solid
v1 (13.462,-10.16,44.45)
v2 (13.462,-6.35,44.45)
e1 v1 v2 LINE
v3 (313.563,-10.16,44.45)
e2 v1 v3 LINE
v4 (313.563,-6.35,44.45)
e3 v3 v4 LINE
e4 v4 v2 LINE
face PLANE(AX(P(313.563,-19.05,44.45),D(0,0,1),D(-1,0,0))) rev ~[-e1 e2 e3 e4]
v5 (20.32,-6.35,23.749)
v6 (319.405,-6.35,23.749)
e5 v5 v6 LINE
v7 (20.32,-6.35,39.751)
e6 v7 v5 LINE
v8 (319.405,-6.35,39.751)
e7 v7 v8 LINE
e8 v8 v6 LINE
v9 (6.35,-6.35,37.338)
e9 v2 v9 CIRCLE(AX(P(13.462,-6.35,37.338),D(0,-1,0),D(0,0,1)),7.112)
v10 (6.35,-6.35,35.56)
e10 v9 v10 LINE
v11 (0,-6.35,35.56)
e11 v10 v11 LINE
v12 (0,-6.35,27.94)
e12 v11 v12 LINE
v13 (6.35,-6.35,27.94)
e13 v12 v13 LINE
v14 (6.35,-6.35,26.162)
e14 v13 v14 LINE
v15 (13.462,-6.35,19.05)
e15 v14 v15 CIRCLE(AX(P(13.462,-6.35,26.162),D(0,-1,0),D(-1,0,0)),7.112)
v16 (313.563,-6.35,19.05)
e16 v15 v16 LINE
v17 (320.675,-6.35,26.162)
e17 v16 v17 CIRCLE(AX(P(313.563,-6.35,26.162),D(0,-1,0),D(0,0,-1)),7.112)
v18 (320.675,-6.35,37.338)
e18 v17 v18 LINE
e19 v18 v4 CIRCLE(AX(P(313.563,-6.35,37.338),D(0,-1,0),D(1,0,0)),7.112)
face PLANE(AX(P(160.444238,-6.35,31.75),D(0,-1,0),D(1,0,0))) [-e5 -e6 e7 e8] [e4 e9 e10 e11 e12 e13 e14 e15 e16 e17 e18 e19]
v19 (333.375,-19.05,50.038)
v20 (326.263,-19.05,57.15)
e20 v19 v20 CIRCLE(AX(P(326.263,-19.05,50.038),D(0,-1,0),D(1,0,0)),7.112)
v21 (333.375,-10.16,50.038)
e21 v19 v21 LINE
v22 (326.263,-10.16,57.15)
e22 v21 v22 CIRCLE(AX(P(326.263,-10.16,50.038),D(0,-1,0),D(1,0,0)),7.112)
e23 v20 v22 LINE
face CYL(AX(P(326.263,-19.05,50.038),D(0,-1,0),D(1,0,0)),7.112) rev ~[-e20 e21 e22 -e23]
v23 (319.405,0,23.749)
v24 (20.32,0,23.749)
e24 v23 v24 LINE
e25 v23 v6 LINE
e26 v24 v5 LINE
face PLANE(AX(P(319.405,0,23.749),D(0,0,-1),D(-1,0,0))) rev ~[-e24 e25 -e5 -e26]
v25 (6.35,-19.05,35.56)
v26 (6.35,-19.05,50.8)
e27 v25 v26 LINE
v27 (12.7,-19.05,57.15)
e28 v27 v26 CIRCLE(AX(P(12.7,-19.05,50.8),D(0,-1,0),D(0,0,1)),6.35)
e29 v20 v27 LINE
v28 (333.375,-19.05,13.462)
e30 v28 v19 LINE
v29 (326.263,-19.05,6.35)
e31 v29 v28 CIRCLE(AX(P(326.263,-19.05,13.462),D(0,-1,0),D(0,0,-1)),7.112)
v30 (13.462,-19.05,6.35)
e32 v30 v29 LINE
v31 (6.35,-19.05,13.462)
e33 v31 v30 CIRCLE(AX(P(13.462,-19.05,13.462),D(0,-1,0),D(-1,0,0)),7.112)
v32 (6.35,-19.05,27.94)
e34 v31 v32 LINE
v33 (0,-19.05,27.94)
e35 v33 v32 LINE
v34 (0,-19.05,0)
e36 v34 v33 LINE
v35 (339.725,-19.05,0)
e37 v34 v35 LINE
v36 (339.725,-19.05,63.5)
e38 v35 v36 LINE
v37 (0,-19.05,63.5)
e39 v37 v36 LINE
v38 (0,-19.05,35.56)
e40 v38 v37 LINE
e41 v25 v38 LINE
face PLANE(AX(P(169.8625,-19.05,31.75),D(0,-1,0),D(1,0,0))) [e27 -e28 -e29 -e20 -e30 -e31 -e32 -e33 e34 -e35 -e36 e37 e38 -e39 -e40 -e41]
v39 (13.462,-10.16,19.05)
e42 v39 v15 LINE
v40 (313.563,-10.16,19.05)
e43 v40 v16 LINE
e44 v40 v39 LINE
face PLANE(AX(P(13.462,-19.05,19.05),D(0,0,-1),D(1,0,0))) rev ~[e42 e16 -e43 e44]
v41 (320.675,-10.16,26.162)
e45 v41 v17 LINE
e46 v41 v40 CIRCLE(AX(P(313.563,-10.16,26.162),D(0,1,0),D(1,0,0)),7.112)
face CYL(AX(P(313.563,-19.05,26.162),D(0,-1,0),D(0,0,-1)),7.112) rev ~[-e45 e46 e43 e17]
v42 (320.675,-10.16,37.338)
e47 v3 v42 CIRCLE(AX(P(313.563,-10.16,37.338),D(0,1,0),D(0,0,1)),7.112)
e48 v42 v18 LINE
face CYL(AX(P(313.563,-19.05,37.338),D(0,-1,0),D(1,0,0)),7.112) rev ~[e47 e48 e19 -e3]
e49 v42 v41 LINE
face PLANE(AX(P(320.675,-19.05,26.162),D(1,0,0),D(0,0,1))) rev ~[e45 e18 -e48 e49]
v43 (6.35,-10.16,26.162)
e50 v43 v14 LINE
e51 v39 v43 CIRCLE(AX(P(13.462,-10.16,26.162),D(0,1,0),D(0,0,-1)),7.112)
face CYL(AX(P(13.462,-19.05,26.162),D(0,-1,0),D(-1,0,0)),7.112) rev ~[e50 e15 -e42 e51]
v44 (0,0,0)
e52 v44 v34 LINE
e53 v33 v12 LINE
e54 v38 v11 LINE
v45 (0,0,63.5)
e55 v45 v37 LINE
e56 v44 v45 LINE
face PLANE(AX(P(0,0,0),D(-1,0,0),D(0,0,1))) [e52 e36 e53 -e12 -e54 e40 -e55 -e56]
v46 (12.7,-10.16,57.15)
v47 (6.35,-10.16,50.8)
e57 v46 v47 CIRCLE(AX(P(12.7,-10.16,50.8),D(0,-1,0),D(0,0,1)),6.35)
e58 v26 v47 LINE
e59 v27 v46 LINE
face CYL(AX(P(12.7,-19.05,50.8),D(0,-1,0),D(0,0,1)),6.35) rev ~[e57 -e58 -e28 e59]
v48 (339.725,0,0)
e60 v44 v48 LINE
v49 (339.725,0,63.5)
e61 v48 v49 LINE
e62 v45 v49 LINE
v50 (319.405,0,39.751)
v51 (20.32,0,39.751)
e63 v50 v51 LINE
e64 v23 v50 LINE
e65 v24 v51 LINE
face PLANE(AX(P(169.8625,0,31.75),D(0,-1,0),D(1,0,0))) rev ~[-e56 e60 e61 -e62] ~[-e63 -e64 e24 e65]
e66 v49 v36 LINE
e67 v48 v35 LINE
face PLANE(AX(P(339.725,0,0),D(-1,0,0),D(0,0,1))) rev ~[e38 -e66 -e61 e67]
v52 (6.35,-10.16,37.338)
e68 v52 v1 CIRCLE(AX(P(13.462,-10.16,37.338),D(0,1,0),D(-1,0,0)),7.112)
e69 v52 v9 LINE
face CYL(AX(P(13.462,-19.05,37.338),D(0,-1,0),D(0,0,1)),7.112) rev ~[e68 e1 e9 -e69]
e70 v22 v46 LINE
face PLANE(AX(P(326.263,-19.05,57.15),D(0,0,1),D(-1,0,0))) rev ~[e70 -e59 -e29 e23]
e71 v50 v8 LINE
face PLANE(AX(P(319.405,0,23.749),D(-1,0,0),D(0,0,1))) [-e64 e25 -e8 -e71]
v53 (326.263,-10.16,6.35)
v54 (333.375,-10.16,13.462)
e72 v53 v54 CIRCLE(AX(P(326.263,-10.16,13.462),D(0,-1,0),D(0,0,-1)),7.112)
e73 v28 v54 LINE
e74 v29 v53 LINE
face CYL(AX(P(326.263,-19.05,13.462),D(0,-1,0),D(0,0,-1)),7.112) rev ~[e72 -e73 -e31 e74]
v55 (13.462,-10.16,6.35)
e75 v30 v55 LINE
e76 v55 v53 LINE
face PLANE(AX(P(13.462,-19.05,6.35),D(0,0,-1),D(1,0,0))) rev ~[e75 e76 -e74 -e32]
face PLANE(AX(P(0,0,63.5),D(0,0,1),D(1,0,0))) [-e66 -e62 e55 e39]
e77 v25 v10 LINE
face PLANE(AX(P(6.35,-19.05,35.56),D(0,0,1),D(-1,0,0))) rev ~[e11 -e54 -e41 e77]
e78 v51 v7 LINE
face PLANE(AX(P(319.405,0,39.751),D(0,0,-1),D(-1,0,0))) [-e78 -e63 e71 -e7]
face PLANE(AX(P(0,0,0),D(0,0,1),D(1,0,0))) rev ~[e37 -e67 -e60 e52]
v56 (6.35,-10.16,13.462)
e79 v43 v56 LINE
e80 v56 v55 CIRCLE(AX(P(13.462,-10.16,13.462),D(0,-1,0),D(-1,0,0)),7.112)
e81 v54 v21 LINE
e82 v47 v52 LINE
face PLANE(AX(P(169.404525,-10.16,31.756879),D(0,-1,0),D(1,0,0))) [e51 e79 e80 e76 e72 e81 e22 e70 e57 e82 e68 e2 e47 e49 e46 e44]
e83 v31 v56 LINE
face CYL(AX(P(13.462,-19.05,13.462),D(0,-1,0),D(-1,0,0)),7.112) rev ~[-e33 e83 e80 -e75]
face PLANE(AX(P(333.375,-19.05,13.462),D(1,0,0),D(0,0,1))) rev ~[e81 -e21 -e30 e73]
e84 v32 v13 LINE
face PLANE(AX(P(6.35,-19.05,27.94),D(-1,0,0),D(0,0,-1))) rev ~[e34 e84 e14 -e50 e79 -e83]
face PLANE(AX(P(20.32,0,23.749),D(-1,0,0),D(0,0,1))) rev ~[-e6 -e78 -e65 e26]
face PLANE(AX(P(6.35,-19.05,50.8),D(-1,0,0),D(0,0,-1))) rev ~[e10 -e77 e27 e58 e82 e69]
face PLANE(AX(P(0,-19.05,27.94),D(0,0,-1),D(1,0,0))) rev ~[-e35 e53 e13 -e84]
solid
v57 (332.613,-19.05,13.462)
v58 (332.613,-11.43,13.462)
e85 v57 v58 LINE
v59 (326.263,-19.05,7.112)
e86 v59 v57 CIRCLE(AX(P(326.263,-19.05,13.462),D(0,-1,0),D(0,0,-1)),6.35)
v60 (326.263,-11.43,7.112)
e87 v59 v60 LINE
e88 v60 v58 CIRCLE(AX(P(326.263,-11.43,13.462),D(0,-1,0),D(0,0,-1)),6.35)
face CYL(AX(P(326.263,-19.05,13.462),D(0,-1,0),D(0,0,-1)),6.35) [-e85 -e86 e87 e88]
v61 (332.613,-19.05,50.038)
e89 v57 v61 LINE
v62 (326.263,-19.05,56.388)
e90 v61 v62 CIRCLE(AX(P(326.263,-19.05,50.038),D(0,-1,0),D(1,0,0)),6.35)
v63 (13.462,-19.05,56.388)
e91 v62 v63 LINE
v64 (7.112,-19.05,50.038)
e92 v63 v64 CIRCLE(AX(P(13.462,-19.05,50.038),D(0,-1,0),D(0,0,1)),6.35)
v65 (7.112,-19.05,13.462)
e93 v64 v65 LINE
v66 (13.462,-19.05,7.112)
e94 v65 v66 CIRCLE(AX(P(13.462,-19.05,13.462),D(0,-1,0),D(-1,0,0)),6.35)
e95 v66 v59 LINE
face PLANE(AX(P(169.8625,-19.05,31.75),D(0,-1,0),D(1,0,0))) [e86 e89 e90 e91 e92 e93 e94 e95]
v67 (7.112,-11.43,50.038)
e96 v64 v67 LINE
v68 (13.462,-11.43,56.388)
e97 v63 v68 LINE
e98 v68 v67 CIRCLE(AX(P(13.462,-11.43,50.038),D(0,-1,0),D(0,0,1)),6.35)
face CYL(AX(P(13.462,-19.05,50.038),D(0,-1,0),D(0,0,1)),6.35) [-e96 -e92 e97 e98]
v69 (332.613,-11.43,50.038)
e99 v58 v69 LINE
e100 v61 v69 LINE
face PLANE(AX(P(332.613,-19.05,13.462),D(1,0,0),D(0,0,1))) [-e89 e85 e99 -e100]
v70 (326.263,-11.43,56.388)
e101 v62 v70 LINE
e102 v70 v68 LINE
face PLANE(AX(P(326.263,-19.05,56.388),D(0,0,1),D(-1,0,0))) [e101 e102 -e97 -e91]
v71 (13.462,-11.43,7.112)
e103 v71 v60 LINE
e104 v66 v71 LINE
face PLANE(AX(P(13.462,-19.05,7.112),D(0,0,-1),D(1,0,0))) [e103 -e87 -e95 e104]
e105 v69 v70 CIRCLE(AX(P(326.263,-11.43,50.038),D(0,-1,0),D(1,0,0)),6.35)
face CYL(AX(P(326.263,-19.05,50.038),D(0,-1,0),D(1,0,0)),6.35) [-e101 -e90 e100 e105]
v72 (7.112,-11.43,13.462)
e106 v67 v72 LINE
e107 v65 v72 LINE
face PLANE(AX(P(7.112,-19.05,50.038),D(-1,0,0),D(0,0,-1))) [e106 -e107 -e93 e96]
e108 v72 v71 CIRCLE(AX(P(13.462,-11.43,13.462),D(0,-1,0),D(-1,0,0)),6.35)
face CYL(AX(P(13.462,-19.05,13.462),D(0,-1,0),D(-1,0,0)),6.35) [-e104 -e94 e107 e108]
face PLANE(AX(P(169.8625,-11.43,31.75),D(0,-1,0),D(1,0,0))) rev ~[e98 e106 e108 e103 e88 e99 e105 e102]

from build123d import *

# Parameters (mm, degrees)
F0_W     = 339.725
F0_H     = 63.5
F1_DEPTH = 19.05
F3_DEPTH = 12.7
F5_DEPTH = 8.89
F7_DEPTH = 7.62
F8_W     = 299.085
F8_H     = 16.002
F9_DEPTH = 25.4


with BuildPart() as f1:
    # F0 (on Front) → F1 (new body)
    with BuildSketch(Plane.XZ):
        with Locations((169.8625, 31.75)):
            Rectangle(F0_W, F0_H)
    extrude(amount=F1_DEPTH)

    # F2 (on face) → F3 (cut)
    with BuildSketch(Plane.XZ.offset(19.05)):
        with BuildLine():
            Line((313.563, 44.45), (13.462, 44.45))
            ThreePointArc((13.462, 44.45), (8.4330565722, 42.3669434278), (6.35, 37.338))
            Line((6.35, 37.338), (6.35, 35.56))
            Line((6.35, 35.56), (0, 35.56))
            Line((0, 35.56), (0, 27.94))
            Line((0, 27.94), (6.35, 27.94))
            Line((6.35, 27.94), (6.35, 26.162))
            ThreePointArc((6.35, 26.162), (8.4330565722, 21.1330565722), (13.462, 19.05))
            Line((13.462, 19.05), (313.563, 19.05))
            ThreePointArc((313.563, 19.05), (318.5919434278, 21.1330565722), (320.675, 26.162))
            Line((320.675, 26.162), (320.675, 37.338))
            ThreePointArc((320.675, 37.338), (318.5919434278, 42.3669434278), (313.563, 44.45))
        make_face()
    extrude(amount=-F3_DEPTH, mode=Mode.SUBTRACT)

    # F4 (on face) → F5 (cut)
    with BuildSketch(Plane.XZ.offset(19.05)):
        with BuildLine():
            Line((326.263, 57.15), (12.7, 57.15))
            ThreePointArc((12.7, 57.15), (8.2098719395, 55.2901280605), (6.35, 50.8))
            Line((6.35, 50.8), (6.35, 37.338))
            ThreePointArc((6.35, 37.338), (8.4330565722, 42.3669434278), (13.462, 44.45))
            Line((13.462, 44.45), (313.563, 44.45))
            ThreePointArc((313.563, 44.45), (318.5919434278, 42.3669434278), (320.675, 37.338))
            Line((320.675, 37.338), (320.675, 26.162))
            ThreePointArc((320.675, 26.162), (318.5919434278, 21.1330565722), (313.563, 19.05))
            Line((313.563, 19.05), (13.462, 19.05))
            ThreePointArc((13.462, 19.05), (8.4330565722, 21.1330565722), (6.35, 26.162))
            Line((6.35, 26.162), (6.35, 13.462))
            ThreePointArc((6.35, 13.462), (8.4330565722, 8.4330565722), (13.462, 6.35))
            Line((13.462, 6.35), (326.263, 6.35))
            ThreePointArc((326.263, 6.35), (331.2919434278, 8.4330565722), (333.375, 13.462))
            Line((333.375, 13.462), (333.375, 50.038))
            ThreePointArc((333.375, 50.038), (331.2919434278, 55.0669434278), (326.263, 57.15))
        make_face()
    extrude(amount=-F5_DEPTH, mode=Mode.SUBTRACT)

    # F8 (on face) → F9 (cut)
    with BuildSketch(Plane(origin=(0, 0, 0), x_dir=(-1, 0, 0), z_dir=(0, 1, 0))):
        with Locations((-169.8625, 31.75)):
            Rectangle(F8_W, F8_H)
    extrude(amount=-F9_DEPTH, mode=Mode.SUBTRACT)


with BuildPart() as f7:
    # F6 (on face) → F7 (new body)
    with BuildSketch(Plane.XZ.offset(19.05)):
        with BuildLine():
            Line((326.263, 56.388), (13.462, 56.388))
            ThreePointArc((13.462, 56.388), (8.9718719395, 54.5281280605), (7.112, 50.038))
            Line((7.112, 50.038), (7.112, 13.462))
            ThreePointArc((7.112, 13.462), (8.9718719395, 8.9718719395), (13.462, 7.112))
            Line((13.462, 7.112), (326.263, 7.112))
            ThreePointArc((326.263, 7.112), (330.7531280605, 8.9718719395), (332.613, 13.462))
            Line((332.613, 13.462), (332.613, 50.038))
            ThreePointArc((332.613, 50.038), (330.7531280605, 54.5281280605), (326.263, 56.388))
        make_face()
    extrude(amount=-F7_DEPTH)


solid = Compound([f1.part, f7.part])
